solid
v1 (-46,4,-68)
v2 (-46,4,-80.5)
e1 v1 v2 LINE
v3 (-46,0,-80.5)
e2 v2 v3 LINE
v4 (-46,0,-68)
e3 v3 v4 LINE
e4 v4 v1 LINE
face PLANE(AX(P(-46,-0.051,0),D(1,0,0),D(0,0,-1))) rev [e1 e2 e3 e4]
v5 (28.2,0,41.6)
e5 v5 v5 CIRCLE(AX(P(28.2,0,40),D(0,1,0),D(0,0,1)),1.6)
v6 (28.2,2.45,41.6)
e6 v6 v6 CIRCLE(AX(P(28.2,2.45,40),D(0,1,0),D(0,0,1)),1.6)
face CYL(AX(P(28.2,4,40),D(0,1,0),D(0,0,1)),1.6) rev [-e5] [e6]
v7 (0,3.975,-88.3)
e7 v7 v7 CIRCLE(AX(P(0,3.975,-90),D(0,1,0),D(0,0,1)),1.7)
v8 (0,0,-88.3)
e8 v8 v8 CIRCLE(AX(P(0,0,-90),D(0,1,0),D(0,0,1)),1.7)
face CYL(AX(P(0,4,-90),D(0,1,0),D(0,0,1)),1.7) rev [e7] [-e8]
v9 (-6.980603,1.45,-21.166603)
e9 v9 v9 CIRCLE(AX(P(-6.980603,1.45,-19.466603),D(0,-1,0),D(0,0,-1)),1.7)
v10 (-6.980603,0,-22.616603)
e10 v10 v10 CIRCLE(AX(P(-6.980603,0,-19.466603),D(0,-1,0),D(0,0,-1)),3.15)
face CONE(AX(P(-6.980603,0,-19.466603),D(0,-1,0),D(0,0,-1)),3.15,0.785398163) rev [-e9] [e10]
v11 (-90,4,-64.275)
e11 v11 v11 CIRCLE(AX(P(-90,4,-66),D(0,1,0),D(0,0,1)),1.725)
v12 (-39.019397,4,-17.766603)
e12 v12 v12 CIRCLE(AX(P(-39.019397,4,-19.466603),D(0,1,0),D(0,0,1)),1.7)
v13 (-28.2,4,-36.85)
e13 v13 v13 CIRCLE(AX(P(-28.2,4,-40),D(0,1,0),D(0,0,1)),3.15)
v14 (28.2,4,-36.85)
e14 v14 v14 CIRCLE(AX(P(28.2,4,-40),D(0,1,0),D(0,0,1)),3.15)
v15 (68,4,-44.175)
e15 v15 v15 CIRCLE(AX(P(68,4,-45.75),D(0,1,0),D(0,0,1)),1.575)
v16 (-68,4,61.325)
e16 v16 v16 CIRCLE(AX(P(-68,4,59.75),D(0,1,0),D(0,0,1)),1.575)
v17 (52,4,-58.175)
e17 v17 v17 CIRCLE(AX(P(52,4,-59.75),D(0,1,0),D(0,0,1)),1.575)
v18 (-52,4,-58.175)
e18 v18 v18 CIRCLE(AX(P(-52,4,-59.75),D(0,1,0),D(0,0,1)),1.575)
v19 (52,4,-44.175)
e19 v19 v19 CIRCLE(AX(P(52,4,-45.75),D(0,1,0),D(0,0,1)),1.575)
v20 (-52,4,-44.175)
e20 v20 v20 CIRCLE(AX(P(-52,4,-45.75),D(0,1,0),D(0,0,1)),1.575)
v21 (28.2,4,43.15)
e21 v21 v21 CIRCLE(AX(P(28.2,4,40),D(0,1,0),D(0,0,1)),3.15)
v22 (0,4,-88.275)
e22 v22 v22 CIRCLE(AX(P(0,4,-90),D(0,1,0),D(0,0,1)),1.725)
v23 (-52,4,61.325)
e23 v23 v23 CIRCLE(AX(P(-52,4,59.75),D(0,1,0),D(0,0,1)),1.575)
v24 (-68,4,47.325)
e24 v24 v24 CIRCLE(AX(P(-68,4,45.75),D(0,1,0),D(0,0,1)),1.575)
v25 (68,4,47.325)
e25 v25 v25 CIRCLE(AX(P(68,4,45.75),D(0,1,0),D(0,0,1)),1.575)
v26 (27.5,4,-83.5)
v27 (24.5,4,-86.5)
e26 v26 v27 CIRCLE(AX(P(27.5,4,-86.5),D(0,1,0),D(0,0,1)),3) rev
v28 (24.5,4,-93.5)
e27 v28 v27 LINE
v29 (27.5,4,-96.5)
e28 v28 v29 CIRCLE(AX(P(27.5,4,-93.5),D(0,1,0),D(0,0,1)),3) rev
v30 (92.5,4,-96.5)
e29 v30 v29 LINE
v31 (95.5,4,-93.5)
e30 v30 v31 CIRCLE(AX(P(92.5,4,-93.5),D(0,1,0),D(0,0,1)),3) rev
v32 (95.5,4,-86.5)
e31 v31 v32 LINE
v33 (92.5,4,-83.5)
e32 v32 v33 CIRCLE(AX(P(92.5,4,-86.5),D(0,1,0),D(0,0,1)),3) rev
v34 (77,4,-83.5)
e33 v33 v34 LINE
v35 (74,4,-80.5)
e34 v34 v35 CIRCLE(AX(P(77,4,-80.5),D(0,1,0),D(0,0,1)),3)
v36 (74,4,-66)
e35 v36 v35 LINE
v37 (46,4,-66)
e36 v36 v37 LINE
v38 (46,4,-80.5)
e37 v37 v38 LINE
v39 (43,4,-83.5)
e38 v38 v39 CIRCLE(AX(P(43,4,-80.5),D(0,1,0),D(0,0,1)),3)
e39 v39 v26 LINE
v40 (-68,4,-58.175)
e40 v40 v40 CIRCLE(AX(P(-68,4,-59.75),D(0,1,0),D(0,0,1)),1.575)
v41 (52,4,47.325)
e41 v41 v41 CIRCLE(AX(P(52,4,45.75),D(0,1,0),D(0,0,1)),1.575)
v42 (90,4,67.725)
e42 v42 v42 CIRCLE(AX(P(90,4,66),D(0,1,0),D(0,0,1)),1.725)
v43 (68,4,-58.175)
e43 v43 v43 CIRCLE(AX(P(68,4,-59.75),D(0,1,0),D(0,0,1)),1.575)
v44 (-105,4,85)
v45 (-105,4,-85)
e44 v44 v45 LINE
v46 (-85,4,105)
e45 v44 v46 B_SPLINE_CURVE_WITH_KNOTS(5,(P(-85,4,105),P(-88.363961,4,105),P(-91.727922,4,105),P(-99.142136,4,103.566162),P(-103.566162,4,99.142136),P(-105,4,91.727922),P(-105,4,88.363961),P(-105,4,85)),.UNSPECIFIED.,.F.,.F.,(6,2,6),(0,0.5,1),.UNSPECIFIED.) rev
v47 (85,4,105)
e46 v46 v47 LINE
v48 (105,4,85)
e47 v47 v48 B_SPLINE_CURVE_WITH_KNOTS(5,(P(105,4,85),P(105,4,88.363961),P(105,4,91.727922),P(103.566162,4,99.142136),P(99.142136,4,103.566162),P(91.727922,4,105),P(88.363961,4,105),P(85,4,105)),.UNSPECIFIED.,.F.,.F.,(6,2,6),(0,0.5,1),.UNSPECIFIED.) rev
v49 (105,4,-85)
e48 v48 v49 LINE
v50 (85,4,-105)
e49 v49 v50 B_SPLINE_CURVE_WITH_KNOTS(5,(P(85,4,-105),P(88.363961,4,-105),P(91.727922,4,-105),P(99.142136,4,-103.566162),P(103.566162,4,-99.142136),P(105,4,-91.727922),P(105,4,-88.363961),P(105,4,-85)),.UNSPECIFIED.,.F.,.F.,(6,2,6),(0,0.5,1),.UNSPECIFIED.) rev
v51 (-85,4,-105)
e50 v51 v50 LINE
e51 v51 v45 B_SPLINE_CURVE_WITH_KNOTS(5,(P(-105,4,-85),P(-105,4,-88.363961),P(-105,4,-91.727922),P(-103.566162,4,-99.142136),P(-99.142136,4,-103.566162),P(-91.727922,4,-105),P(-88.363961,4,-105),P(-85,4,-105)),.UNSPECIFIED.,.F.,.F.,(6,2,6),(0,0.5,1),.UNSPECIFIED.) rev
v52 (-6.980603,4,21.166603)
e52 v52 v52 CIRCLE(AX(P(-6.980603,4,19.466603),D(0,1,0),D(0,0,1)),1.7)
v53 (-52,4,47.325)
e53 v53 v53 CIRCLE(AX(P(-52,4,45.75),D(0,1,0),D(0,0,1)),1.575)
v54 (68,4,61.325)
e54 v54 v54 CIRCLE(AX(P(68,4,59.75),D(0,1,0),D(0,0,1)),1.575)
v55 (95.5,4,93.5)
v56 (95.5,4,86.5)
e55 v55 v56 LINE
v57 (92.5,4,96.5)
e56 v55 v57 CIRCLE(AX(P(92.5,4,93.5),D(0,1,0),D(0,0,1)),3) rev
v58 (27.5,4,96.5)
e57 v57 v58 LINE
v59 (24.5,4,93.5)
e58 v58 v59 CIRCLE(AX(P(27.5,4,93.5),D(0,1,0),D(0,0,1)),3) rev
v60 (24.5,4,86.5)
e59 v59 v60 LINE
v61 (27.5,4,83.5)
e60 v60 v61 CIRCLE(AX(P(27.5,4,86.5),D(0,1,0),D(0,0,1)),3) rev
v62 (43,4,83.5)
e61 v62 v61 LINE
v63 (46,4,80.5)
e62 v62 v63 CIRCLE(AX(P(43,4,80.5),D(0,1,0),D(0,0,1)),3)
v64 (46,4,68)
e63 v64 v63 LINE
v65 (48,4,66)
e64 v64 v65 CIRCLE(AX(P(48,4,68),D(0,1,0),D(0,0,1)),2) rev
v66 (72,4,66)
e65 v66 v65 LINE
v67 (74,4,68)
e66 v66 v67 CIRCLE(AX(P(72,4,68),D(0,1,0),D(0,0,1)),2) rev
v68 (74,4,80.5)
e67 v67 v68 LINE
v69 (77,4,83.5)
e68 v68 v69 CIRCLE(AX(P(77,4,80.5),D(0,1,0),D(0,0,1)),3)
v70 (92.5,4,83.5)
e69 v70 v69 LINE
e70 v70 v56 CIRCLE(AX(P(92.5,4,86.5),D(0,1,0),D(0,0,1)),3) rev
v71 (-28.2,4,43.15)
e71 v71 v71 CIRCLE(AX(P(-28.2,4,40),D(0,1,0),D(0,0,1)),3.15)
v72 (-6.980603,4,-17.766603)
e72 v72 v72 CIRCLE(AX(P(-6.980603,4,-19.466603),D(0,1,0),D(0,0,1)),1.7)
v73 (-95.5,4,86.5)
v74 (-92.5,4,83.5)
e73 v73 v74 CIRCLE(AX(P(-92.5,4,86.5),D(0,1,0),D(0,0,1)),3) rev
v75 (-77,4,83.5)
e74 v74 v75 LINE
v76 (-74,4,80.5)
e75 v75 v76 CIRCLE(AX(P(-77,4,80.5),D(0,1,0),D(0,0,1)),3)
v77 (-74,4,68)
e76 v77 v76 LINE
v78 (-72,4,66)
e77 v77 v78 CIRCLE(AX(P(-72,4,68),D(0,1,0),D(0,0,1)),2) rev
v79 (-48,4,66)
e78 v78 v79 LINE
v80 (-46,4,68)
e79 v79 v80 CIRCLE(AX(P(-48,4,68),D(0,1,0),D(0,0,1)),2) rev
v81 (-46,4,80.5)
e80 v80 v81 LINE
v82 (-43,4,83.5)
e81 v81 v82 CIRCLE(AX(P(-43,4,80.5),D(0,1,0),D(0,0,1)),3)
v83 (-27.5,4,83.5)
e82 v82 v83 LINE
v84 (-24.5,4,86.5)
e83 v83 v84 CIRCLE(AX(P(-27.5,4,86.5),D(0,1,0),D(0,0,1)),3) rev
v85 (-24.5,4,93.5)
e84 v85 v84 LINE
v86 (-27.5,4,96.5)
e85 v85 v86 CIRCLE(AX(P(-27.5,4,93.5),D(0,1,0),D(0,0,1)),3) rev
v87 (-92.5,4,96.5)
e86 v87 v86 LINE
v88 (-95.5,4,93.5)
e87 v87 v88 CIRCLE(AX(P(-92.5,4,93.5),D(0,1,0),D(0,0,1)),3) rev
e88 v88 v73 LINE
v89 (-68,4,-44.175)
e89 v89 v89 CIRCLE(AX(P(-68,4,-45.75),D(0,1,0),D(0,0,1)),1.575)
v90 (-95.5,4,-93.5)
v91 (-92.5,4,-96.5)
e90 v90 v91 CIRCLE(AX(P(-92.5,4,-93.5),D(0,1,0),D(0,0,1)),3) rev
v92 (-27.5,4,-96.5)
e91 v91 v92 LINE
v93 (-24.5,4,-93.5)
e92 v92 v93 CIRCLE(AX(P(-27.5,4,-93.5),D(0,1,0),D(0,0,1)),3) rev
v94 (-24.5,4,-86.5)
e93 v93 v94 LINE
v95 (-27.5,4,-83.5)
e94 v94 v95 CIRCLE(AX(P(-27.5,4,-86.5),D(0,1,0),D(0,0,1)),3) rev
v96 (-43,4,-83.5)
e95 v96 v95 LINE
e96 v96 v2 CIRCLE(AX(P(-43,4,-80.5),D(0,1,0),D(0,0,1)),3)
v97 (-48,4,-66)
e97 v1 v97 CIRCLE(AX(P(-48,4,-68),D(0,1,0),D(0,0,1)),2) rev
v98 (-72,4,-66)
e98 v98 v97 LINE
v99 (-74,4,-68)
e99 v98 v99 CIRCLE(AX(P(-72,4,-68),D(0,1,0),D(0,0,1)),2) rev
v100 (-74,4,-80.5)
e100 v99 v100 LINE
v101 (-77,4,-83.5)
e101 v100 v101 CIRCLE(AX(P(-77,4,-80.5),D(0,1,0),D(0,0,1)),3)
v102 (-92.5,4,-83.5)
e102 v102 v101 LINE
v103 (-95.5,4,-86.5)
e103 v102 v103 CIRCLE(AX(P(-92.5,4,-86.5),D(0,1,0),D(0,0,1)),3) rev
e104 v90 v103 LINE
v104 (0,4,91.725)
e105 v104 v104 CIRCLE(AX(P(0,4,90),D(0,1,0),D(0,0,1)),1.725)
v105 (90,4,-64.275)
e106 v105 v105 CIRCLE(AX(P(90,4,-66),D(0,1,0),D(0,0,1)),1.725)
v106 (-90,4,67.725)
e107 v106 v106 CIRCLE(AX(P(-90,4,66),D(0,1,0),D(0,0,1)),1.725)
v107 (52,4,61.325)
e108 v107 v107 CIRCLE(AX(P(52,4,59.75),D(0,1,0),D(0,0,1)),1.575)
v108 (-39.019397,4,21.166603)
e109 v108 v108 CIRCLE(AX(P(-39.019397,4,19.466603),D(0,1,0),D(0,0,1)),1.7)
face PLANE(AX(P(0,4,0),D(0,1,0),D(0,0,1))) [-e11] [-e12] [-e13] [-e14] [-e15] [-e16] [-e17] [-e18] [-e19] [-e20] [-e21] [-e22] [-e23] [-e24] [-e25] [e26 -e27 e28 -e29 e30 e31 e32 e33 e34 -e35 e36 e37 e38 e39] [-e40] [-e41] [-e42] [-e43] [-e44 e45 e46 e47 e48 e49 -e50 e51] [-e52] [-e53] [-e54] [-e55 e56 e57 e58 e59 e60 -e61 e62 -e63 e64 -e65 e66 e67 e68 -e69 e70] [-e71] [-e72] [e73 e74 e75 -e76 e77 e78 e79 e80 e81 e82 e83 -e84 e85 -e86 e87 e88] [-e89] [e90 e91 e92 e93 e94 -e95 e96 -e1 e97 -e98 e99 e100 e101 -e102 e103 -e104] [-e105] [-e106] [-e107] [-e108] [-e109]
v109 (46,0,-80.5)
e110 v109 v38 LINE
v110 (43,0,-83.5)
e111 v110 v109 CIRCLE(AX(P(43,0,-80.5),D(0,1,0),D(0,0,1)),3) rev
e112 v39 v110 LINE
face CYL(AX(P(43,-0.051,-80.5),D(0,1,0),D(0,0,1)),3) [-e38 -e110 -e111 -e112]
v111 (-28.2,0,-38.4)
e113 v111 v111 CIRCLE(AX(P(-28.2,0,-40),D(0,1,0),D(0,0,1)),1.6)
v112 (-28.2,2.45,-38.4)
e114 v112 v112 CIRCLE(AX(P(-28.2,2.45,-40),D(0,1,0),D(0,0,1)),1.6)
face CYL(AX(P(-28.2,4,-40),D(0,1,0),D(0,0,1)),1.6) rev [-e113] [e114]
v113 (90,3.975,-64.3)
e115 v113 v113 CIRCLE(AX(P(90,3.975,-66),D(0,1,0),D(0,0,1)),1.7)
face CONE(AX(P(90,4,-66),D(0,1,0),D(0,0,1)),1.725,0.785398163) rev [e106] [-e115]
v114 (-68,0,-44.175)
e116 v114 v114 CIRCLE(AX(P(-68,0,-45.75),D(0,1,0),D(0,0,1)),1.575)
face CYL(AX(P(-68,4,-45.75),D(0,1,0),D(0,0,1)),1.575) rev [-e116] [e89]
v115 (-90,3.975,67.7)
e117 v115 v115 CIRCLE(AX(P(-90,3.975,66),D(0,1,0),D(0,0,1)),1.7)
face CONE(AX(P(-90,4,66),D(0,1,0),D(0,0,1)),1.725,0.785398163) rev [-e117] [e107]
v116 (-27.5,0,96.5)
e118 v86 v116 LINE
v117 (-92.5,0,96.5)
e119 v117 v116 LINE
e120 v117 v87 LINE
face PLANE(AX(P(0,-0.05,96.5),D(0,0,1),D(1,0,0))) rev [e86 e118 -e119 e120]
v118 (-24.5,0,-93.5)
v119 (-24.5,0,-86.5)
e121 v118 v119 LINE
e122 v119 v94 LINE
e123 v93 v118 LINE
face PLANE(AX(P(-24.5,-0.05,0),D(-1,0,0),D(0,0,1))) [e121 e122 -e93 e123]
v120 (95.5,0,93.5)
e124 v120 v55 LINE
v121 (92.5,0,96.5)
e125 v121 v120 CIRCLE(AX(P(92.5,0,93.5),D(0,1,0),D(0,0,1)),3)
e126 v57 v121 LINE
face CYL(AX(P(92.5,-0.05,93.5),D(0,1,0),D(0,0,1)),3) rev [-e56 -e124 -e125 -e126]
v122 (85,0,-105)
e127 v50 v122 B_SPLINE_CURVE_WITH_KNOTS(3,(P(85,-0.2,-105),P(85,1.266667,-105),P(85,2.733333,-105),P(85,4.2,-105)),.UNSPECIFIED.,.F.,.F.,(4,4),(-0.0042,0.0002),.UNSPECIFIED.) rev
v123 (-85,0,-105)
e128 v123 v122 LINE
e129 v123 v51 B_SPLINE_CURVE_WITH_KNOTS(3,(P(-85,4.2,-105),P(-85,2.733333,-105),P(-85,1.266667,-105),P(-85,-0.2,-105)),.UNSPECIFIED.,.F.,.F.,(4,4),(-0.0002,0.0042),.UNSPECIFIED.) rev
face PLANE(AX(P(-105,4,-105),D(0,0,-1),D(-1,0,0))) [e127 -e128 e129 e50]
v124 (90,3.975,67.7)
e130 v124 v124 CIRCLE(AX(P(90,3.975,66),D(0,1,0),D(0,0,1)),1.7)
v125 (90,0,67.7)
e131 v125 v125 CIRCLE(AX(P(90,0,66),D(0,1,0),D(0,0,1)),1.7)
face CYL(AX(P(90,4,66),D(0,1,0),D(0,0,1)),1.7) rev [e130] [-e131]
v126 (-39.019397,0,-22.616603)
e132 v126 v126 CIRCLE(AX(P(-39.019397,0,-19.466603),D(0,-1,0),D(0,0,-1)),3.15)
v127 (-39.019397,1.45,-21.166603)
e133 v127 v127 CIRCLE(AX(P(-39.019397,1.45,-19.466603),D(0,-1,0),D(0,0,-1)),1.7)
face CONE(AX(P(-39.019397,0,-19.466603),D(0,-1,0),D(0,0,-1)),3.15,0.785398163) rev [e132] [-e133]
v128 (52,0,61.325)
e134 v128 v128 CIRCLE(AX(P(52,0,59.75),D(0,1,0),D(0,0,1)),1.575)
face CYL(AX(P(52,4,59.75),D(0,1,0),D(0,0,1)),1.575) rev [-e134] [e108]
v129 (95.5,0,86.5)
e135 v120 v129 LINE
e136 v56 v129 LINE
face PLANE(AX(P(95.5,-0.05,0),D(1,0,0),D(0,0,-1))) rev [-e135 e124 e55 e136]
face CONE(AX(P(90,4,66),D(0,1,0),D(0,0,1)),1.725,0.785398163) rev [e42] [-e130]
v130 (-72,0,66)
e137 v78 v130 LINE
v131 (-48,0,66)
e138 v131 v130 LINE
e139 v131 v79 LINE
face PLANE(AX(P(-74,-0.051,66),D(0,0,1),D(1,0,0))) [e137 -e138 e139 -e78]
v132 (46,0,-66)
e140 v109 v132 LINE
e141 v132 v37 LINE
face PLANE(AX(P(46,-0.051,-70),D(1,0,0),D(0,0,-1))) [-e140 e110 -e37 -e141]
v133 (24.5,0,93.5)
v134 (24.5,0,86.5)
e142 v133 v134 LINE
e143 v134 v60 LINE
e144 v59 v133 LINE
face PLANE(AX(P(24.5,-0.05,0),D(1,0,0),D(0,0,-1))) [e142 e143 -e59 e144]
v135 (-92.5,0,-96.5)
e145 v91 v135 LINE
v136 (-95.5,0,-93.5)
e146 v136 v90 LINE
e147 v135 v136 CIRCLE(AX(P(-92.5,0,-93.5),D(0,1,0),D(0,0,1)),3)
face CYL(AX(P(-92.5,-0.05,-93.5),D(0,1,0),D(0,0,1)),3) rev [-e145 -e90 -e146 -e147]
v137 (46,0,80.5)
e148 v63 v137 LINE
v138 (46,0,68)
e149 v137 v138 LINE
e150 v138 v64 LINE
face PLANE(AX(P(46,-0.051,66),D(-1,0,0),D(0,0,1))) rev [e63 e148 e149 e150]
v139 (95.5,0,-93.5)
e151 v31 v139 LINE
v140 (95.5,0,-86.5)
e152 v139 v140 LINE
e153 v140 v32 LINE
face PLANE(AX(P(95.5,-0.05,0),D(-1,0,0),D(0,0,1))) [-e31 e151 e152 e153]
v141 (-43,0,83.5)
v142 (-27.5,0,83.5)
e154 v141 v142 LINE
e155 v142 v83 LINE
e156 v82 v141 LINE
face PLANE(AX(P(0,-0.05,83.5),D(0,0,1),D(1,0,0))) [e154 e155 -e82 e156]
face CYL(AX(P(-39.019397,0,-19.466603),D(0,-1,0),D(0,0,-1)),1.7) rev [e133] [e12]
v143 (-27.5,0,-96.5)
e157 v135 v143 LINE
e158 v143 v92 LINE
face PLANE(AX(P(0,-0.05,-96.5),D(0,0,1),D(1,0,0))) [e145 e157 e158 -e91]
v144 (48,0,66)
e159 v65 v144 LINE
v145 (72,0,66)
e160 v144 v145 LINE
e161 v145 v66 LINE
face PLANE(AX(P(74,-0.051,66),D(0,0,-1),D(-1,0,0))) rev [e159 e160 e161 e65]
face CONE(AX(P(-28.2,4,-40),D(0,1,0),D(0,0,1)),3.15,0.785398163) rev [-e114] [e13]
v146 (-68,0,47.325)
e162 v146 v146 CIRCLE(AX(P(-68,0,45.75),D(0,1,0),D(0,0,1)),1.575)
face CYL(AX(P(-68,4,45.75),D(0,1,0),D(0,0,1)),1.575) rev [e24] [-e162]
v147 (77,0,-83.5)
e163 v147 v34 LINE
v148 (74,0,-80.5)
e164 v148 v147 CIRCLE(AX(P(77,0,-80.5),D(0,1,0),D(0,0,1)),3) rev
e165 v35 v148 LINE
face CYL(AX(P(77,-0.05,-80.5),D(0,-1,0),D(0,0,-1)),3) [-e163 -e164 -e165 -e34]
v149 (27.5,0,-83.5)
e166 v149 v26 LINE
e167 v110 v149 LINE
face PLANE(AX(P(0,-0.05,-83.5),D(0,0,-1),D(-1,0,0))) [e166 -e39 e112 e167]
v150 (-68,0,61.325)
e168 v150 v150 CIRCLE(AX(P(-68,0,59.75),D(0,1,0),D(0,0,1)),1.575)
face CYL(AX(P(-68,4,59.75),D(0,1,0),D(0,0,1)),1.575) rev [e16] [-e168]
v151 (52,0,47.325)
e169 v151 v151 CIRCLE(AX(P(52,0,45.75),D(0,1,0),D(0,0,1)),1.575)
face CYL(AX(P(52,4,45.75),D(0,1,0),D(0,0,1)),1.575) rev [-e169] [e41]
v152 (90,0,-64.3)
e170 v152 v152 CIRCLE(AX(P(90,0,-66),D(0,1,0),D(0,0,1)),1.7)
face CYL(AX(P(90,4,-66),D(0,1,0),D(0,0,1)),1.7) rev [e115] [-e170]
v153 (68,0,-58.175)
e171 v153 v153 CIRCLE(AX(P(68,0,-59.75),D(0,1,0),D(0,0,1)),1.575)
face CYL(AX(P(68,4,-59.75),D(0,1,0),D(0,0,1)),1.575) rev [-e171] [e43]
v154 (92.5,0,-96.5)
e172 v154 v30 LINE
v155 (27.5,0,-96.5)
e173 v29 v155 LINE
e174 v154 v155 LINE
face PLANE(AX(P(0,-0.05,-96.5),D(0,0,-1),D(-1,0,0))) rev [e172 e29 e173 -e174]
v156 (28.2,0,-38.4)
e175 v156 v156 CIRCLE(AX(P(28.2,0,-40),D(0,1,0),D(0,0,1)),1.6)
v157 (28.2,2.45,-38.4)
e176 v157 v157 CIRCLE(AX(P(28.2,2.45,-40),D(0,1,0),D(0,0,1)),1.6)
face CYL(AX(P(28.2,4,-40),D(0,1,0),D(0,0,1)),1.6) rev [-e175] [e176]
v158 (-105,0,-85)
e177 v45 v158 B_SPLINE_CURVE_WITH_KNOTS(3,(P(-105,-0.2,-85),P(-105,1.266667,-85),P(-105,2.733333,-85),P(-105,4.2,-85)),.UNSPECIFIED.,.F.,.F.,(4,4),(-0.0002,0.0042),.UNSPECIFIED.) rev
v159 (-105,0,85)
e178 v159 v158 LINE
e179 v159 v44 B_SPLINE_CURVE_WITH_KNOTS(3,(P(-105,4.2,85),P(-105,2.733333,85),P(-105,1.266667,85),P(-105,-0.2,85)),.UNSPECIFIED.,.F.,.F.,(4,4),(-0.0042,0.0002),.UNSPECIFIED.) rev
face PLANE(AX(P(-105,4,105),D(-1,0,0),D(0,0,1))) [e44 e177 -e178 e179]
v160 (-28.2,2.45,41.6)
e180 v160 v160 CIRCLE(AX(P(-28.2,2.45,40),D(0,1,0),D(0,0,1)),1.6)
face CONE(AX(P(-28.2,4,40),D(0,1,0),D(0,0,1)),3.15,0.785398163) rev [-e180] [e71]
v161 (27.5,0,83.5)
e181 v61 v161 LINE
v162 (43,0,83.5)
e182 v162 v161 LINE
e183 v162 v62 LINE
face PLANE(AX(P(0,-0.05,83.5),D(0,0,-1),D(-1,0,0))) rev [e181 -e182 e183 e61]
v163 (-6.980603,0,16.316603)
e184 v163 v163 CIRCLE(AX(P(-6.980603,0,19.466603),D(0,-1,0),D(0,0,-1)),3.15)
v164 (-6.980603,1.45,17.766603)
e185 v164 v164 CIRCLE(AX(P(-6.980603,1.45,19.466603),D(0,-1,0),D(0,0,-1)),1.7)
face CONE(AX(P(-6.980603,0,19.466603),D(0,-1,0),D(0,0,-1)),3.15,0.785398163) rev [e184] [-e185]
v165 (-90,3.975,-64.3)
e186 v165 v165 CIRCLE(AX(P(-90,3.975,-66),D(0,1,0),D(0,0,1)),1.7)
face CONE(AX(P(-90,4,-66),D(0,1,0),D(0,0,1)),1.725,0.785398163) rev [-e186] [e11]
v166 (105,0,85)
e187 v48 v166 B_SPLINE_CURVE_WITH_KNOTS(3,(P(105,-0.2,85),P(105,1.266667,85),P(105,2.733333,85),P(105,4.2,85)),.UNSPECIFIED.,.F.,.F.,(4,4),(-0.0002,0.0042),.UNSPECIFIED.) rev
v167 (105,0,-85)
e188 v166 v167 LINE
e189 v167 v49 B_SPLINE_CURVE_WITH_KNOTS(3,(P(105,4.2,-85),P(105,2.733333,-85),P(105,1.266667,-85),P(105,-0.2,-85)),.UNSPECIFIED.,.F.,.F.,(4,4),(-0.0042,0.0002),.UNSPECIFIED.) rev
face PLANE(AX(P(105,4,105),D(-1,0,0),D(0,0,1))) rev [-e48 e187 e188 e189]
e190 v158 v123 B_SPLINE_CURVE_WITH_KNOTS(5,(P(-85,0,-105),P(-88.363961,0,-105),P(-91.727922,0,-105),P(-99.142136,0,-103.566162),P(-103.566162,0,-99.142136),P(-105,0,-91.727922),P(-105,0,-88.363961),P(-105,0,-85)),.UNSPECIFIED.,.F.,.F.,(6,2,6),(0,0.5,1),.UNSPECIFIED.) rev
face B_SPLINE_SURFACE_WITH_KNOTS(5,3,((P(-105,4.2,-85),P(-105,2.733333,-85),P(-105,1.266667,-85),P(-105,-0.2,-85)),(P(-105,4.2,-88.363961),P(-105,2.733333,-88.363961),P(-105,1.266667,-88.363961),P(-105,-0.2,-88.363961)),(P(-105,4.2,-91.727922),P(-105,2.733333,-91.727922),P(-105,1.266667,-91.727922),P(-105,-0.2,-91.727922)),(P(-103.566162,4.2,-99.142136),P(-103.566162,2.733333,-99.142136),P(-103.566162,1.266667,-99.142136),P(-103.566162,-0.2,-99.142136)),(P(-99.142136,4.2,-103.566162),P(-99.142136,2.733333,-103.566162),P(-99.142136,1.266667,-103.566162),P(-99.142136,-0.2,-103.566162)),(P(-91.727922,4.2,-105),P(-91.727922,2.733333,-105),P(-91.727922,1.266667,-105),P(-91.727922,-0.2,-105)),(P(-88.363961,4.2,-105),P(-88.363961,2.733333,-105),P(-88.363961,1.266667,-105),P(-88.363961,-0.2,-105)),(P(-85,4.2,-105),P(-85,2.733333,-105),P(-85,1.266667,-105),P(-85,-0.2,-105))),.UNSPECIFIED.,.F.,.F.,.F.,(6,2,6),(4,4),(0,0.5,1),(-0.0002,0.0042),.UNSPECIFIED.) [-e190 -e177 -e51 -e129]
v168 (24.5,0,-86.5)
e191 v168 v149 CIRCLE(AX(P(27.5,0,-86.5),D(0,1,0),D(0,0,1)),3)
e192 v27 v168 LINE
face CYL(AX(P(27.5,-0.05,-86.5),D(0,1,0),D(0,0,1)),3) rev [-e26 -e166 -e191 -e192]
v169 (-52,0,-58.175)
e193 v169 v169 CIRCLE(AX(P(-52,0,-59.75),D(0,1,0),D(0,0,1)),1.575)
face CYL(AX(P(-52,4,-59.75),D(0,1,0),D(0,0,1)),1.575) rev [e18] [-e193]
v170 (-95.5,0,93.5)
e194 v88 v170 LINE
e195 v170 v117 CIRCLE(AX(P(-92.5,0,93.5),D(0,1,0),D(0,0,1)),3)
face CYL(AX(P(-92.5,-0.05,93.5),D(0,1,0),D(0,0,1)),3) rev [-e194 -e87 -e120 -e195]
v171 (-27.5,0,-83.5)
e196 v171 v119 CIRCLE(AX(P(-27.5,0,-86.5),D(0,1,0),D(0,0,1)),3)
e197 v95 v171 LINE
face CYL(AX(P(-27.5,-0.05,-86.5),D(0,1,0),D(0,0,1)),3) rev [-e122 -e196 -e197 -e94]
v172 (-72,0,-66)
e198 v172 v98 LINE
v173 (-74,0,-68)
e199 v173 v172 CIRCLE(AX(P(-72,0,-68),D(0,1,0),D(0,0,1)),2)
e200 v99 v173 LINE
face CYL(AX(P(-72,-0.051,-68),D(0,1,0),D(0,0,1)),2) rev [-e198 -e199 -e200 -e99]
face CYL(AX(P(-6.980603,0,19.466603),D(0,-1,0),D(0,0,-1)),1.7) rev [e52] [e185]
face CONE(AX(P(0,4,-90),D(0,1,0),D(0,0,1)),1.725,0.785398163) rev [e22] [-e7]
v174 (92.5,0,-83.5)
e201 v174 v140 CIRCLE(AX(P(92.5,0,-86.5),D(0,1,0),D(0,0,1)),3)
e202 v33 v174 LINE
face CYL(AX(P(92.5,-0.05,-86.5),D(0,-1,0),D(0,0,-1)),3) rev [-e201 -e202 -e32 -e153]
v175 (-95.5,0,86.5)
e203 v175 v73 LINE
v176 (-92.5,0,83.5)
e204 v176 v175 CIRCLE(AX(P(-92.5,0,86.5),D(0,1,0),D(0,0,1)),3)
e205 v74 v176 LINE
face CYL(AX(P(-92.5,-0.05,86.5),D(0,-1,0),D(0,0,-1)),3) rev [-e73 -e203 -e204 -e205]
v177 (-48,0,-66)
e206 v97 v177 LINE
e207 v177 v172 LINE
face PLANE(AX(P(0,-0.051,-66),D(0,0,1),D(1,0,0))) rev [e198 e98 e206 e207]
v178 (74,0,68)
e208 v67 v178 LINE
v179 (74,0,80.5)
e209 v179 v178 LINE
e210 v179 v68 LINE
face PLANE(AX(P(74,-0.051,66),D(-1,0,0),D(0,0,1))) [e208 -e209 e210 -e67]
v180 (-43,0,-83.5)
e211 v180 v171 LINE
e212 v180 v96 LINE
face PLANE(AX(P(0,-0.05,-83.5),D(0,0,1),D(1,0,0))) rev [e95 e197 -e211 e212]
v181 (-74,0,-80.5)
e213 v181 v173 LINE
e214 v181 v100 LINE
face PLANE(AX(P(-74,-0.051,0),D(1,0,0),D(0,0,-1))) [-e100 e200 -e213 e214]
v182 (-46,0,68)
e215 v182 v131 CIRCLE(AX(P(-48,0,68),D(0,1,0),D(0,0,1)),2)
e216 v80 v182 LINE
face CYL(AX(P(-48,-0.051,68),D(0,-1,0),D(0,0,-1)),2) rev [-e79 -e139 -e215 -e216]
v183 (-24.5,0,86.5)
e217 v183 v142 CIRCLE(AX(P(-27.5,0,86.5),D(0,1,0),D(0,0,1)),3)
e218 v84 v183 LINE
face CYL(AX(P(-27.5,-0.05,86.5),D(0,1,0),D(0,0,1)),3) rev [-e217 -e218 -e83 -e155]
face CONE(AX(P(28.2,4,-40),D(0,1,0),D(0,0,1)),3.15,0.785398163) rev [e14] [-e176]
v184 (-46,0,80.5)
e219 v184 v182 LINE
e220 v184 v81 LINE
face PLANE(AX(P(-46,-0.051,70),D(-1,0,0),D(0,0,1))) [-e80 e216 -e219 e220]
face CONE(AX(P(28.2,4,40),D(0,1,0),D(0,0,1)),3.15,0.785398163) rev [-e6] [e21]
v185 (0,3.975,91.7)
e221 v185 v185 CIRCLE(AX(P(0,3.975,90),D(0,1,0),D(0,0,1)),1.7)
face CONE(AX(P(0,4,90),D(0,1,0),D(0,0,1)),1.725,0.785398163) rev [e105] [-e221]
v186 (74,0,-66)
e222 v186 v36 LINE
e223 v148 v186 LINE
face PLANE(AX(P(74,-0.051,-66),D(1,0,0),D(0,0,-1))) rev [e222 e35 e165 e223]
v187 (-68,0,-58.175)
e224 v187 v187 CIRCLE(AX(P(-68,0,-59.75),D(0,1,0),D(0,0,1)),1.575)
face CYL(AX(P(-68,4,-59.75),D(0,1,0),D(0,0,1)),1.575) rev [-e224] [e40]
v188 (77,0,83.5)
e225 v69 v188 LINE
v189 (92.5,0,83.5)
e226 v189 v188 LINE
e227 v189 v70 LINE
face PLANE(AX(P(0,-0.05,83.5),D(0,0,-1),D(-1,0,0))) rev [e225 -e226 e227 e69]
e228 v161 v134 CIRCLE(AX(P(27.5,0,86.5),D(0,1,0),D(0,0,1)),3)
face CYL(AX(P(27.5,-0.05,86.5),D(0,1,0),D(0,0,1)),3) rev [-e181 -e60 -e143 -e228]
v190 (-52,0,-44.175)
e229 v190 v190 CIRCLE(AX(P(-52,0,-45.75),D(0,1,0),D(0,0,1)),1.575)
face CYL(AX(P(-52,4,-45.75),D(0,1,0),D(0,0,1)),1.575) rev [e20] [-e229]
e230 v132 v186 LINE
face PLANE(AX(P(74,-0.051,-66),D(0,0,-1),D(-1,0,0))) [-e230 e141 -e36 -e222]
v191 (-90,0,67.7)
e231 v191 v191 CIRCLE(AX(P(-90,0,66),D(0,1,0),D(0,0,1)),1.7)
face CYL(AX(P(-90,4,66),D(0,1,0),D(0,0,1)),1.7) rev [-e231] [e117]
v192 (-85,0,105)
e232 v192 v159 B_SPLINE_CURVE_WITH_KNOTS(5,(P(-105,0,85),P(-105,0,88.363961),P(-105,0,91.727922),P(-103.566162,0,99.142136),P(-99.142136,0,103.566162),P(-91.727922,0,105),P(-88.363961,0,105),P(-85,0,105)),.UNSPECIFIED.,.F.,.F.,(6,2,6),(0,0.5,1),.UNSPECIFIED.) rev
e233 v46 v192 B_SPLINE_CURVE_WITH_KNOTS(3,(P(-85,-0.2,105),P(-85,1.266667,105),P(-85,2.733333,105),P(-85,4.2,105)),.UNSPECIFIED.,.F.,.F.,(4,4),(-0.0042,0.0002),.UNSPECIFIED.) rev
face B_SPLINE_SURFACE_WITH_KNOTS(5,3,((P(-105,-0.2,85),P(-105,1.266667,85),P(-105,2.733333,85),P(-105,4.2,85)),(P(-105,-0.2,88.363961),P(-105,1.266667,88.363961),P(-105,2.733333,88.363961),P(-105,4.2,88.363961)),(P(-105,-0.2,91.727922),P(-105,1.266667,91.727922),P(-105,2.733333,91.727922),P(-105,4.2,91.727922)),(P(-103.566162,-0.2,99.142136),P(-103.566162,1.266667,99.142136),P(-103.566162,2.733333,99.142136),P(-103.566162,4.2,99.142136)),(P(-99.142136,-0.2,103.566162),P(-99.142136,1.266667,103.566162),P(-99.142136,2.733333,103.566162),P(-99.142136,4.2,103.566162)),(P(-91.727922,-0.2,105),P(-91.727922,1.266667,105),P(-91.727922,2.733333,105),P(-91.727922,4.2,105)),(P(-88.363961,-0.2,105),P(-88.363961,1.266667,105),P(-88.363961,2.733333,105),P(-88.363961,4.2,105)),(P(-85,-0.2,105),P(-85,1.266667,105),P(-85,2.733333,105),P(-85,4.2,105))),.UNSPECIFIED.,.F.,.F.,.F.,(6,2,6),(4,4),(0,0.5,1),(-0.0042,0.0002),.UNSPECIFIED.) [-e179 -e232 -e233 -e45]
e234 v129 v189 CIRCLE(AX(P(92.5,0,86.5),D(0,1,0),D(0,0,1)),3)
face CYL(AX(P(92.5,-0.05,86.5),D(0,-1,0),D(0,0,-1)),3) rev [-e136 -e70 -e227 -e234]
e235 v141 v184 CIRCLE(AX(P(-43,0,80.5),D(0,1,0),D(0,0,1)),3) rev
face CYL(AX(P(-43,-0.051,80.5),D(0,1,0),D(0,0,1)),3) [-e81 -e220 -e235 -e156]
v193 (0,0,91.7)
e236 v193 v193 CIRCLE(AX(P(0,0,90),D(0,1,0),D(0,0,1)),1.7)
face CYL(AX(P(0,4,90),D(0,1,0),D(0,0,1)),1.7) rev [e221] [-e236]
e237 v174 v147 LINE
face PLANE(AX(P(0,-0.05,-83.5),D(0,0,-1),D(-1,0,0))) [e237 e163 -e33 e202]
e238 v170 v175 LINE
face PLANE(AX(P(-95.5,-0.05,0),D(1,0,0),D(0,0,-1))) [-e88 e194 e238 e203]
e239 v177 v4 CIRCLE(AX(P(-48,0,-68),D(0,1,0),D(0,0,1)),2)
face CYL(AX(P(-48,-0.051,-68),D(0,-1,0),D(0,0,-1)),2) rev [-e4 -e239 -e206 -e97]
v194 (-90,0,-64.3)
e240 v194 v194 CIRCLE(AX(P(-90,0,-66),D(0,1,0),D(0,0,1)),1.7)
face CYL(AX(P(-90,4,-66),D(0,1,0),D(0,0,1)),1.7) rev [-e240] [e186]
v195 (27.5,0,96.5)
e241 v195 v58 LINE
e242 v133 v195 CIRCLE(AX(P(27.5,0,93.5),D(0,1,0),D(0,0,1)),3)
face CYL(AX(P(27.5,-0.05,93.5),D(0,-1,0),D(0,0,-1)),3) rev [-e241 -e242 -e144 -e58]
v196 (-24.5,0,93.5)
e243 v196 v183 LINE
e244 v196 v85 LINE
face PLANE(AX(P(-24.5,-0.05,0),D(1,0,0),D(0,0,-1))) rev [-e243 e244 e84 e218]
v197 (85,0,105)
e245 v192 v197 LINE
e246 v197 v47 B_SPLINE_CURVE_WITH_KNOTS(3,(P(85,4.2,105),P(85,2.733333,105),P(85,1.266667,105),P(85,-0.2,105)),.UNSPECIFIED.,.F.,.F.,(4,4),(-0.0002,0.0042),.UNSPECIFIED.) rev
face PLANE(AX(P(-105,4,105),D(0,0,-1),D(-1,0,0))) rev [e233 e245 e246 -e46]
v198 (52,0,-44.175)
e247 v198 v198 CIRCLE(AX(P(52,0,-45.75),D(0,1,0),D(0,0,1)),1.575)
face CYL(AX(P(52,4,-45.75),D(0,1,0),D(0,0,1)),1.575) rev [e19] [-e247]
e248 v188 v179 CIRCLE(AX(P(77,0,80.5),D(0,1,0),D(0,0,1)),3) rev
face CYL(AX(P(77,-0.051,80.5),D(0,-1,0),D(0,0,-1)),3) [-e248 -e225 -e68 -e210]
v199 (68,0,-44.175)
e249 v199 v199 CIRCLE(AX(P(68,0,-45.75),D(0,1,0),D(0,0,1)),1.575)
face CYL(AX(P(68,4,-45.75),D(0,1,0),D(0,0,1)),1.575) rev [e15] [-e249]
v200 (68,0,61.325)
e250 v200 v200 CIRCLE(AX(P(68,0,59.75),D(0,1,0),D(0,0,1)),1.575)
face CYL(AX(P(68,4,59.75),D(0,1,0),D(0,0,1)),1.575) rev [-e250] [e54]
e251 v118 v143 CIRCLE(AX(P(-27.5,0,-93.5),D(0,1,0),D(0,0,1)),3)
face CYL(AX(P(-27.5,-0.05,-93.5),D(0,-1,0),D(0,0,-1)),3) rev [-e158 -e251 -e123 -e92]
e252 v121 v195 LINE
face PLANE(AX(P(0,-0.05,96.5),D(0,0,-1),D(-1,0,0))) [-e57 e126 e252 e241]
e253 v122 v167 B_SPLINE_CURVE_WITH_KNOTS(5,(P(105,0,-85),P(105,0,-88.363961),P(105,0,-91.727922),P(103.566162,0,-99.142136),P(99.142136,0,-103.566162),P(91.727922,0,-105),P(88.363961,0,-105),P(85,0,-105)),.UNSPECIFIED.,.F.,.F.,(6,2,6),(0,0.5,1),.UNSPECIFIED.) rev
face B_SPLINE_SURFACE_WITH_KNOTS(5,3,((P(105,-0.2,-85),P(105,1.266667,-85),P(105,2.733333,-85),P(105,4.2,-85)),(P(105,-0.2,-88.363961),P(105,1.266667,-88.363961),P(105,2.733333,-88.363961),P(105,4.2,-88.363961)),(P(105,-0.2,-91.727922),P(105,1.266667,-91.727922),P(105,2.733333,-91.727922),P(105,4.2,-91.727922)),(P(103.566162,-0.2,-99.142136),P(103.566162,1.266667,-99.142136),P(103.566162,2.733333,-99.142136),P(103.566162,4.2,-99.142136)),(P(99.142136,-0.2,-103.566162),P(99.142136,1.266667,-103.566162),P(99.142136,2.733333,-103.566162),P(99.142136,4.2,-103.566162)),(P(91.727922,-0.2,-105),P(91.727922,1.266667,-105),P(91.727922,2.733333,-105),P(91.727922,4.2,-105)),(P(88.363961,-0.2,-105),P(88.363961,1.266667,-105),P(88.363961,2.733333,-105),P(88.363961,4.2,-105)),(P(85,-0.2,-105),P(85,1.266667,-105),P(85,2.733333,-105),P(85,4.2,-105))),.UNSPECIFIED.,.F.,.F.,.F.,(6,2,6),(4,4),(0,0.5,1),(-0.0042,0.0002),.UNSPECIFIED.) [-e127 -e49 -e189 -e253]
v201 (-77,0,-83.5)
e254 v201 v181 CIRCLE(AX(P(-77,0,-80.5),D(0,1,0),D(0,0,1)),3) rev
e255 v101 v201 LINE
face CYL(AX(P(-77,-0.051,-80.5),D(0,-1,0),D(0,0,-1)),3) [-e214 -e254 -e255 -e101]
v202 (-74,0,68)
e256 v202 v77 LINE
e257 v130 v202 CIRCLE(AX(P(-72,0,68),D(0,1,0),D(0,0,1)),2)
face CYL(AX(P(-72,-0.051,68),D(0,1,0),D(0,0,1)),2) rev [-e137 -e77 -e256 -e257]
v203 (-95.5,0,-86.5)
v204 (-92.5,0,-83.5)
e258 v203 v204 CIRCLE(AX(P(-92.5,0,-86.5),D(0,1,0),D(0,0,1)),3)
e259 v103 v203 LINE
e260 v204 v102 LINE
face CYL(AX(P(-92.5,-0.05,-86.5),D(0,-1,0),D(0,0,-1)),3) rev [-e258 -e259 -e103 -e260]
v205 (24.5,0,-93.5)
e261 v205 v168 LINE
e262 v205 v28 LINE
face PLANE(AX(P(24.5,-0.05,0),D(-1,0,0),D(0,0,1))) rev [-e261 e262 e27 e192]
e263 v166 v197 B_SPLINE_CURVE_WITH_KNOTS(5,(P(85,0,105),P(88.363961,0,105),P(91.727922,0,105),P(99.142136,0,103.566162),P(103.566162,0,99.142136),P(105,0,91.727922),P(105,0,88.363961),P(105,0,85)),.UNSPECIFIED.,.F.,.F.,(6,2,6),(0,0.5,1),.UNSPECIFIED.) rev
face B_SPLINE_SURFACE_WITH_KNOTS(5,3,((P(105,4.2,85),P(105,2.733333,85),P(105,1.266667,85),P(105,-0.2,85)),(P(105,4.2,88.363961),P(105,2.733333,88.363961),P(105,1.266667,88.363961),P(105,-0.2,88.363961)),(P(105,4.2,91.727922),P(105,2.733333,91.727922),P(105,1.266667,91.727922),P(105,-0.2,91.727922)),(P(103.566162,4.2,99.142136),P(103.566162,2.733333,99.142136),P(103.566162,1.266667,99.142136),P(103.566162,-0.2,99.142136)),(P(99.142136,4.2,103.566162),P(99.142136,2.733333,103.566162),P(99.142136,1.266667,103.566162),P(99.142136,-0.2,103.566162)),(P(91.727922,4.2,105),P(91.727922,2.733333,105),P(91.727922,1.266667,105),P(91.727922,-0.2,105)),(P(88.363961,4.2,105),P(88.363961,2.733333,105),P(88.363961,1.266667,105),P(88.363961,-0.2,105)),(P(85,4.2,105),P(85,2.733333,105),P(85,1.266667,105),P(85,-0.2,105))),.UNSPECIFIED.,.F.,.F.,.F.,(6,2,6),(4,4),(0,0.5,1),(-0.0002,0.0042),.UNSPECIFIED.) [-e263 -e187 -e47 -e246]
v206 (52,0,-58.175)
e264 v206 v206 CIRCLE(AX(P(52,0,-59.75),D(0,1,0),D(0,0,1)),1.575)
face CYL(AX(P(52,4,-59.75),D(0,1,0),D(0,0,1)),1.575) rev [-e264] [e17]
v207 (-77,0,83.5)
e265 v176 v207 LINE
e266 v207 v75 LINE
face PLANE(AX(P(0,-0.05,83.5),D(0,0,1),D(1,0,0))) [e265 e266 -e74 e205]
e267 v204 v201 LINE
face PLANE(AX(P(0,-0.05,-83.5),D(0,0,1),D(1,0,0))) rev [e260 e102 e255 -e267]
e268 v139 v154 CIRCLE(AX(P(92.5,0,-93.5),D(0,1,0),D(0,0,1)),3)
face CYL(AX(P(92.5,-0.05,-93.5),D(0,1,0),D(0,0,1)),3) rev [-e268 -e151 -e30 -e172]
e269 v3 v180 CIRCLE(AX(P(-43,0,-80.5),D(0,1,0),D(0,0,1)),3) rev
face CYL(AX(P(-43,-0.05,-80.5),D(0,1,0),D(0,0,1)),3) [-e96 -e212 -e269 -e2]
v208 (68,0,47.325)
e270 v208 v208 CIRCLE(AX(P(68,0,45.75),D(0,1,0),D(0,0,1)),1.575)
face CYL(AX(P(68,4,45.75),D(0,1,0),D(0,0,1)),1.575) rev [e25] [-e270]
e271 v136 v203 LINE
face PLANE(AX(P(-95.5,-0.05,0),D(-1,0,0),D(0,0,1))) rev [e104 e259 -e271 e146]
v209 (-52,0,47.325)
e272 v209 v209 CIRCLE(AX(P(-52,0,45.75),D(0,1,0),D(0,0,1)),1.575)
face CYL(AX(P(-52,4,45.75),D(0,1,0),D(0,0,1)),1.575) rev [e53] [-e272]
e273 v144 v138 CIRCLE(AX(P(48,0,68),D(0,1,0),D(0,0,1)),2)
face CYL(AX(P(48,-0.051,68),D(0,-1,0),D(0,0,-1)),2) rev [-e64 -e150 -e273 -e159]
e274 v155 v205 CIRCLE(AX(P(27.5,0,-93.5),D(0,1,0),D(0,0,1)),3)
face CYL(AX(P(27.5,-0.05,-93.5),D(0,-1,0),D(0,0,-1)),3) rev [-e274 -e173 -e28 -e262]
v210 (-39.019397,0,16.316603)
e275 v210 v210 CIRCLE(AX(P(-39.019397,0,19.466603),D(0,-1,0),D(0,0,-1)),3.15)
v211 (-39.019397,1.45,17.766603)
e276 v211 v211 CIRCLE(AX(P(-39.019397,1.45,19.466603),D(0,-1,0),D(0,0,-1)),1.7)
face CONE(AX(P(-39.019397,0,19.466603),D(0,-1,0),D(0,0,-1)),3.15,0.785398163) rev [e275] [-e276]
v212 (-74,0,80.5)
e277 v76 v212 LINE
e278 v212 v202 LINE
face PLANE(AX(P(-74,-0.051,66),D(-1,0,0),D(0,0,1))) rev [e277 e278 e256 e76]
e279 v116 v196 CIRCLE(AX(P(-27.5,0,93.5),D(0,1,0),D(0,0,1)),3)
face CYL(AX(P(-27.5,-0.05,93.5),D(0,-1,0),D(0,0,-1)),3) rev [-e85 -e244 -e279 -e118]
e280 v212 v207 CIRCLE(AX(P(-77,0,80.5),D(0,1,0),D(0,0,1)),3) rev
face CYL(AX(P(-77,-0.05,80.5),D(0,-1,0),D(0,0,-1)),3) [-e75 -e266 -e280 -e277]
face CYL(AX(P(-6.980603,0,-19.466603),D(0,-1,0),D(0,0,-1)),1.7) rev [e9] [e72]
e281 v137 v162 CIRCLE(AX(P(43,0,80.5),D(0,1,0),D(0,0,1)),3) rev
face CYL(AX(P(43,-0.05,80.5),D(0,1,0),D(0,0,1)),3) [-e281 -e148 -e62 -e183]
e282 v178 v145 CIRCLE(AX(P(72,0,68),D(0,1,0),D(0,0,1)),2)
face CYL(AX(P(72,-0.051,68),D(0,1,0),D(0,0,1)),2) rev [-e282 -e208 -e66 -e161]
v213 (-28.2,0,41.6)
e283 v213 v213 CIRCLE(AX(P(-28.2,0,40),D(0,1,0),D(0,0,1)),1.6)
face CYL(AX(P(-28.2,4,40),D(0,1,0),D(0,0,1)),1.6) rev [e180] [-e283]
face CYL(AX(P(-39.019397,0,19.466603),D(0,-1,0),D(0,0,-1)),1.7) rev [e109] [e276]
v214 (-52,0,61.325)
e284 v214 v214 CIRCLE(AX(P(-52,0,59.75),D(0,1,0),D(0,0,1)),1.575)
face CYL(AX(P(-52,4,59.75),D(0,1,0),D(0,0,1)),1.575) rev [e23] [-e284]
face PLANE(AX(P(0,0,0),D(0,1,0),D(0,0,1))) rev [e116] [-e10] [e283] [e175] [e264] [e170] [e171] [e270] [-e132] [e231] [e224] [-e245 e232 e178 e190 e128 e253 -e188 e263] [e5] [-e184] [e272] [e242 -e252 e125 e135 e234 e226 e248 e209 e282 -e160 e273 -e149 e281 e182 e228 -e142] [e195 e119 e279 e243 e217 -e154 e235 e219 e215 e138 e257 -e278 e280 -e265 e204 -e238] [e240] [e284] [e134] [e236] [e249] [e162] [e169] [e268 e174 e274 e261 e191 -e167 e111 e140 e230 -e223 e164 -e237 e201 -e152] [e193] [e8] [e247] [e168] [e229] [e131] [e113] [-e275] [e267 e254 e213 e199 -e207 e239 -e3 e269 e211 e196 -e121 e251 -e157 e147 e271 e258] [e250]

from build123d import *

# Parameters (mm, degrees)
SKETCH_1_W                    = 210
SKETCH_1_H                    = 210
EXTRUDE_1_DEPTH               = 4
FILLET_1_SIZE                 = 20
HOLE_WIZARD_M31_D             = 3.15
HOLE_WIZARD_M31_DEPTH         = 8
HOLE_WIZARD_M31_TIP           = 0.946355475
HOLE_WIZARD_M35_D             = 3.4
HOLE_WIZARD_M35_CSINK_D       = 3.45
HOLE_WIZARD_M35_CSINK_ANGLE   = 90
HOLE_WIZARD_M31_2_D           = 3.2
HOLE_WIZARD_M31_2_DEPTH       = 4
HOLE_WIZARD_M31_2_CSINK_D     = 6.3
HOLE_WIZARD_M31_2_CSINK_ANGLE = 90
HOLE_WIZARD_M31_2_TIP         = 0.96137699
SKETCH_45_W                   = 71
SKETCH_45_H                   = 13
CUT_EXTRUDE_3_DEPTH           = 149.546289226
CUT_EXTRUDE_2_REACH           = 150.546
SKETCH_17_W                   = 28
SKETCH_17_H                   = 13.5
SKETCH_17_H_2                 = 4
FILLET_2_R                    = 2
FILLET_3_R                    = 3
FILLET_5_R                    = 3
HOLE_WIZARD_M32_D             = 3.4
HOLE_WIZARD_M32_CSINK_D       = 6.3
HOLE_WIZARD_M32_CSINK_ANGLE   = 90


with BuildPart() as part:
    # Эскиз1 → Бобышка-Вытянуть1 (new body)
    with BuildSketch(Plane(origin=(0, 0, 0), x_dir=(1, 0, 0), z_dir=(0, 1, 0))):
        Rectangle(SKETCH_1_W, SKETCH_1_H)
    extrude(amount=EXTRUDE_1_DEPTH)

    # Скругление1
    # a fillet whose section is not a circle: 20 mm, written as the material it takes off along each edge
    with BuildSketch(Plane(origin=(-105, -50, -105), x_dir=(1, 0, 0), z_dir=(0, 1, 0)), Plane(origin=(105, -50, -105), x_dir=(0, 0, 1), z_dir=(0, 1, 0)), Plane(origin=(105, -50, 105), x_dir=(-1, 0, 0), z_dir=(0, 1, 0))) as fillet_1_piece_1:
        with BuildLine():
            add(Edge.make_bspline([(FILLET_1_SIZE, 0), (FILLET_1_SIZE * 0.831801948466, 0), (FILLET_1_SIZE * 0.663603896932, 0), (FILLET_1_SIZE * 0.292893218813, -FILLET_1_SIZE * 0.0716919198361), (FILLET_1_SIZE * 0.0716919198361, -FILLET_1_SIZE * 0.292893218813), (0, -FILLET_1_SIZE * 0.663603896932), (0, -FILLET_1_SIZE * 0.831801948466), (0, -FILLET_1_SIZE)], knots=[0, 0, 0, 0, 0, 0, 0.5, 0.5, 1, 1, 1, 1, 1, 1], degree=5))
            Line((0, -FILLET_1_SIZE), (0, 0))
            Line((0, 0), (FILLET_1_SIZE, 0))
        make_face()
    extrude(amount=104, mode=Mode.SUBTRACT)
    with BuildSketch(Plane(origin=(-105, -50, 105), x_dir=(1, 0, 0), z_dir=(0, 1, 0))) as fillet_1_piece_2:
        with BuildLine():
            add(Edge.make_bspline([(FILLET_1_SIZE, 0), (FILLET_1_SIZE * 0.831801948466, 0), (FILLET_1_SIZE * 0.663603896932, 0), (FILLET_1_SIZE * 0.292893218813, FILLET_1_SIZE * 0.0716919198361), (FILLET_1_SIZE * 0.0716919198361, FILLET_1_SIZE * 0.292893218813), (0, FILLET_1_SIZE * 0.663603896932), (0, FILLET_1_SIZE * 0.831801948466), (0, FILLET_1_SIZE)], knots=[0, 0, 0, 0, 0, 0, 0.5, 0.5, 1, 1, 1, 1, 1, 1], degree=5))
            Line((0, FILLET_1_SIZE), (0, 0))
            Line((0, 0), (FILLET_1_SIZE, 0))
        make_face()
    extrude(amount=104, mode=Mode.SUBTRACT)

    # Hole Wizard M31
    with Locations(Plane(origin=(0, 4, 0), x_dir=(1, 0, 0), z_dir=(0, 1, 0))):
        with Locations((-68, 59.75), (-52, 59.75), (-68, 45.75), (-52, 45.75), (-52, -59.75), (-52, -45.75), (-68, -59.75), (52, -59.75), (52, -45.75), (68, -59.75), (68, -45.75), (52, 59.75), (52, 45.75), (-68, -45.75), (68, 45.75), (68, 59.75)):
            Hole(HOLE_WIZARD_M31_D / 2, depth=HOLE_WIZARD_M31_DEPTH)
            with Locations((0, 0, -(HOLE_WIZARD_M31_DEPTH + HOLE_WIZARD_M31_TIP / 2))):  # 118° drill point
                Cone(0, HOLE_WIZARD_M31_D / 2, HOLE_WIZARD_M31_TIP, mode=Mode.SUBTRACT)

    # Отверстие с зазором M35 (through all)
    with Locations(Plane(origin=(0, 4, 0), x_dir=(1, 0, 0), z_dir=(0, 1, 0))):
        with Locations((90, 66), (-90, 66), (-90, -66), (90, -66), (0, -90), (0, 90)):
            CounterSinkHole(HOLE_WIZARD_M35_D / 2, HOLE_WIZARD_M35_CSINK_D / 2, counter_sink_angle=HOLE_WIZARD_M35_CSINK_ANGLE)

    # Hole Wizard M31 2
    with Locations(Plane(origin=(0, 4, 0), x_dir=(1, 0, 0), z_dir=(0, 1, 0))):
        with Locations((28.2, 40), (-28.2, 40), (-28.2, -40), (28.2, -40)):
            CounterSinkHole(HOLE_WIZARD_M31_2_D / 2, HOLE_WIZARD_M31_2_CSINK_D / 2, depth=HOLE_WIZARD_M31_2_DEPTH, counter_sink_angle=HOLE_WIZARD_M31_2_CSINK_ANGLE)
            with Locations((0, 0, -(HOLE_WIZARD_M31_2_DEPTH + HOLE_WIZARD_M31_2_TIP / 2))):  # 118° drill point
                Cone(0, HOLE_WIZARD_M31_2_D / 2, HOLE_WIZARD_M31_2_TIP, mode=Mode.SUBTRACT)

    # Эскиз45 → Вырез-Вытянуть3 (cut, through all)
    with BuildSketch(Plane(origin=(0, 4, 0), x_dir=(1, 0, 0), z_dir=(0, 1, 0))):
        with Locations((-60, 90)):
            Rectangle(SKETCH_45_W, SKETCH_45_H)
        with Locations((-60, -90)):
            Rectangle(SKETCH_45_W, SKETCH_45_H)
        with Locations((60, -90)):
            Rectangle(SKETCH_45_W, SKETCH_45_H)
        with Locations((60, 90)):
            Rectangle(SKETCH_45_W, SKETCH_45_H)
    extrude(amount=-CUT_EXTRUDE_3_DEPTH, mode=Mode.SUBTRACT)

    # Эскиз17 → Вырез-Вытянуть2 (cut, up to next)
    with BuildSketch(Plane(origin=(0, 4, 0), x_dir=(1, 0, 0), z_dir=(0, 1, 0)), mode=Mode.PRIVATE) as cut_extrude_2_sk1:
        with Locations((-60, 76.75)):
            Rectangle(SKETCH_17_W, SKETCH_17_H)
    cut_extrude_2_tool1 = extrude(cut_extrude_2_sk1.sketch, amount=-CUT_EXTRUDE_2_REACH, mode=Mode.PRIVATE) & part.part
    # Эскиз17 → Вырез-Вытянуть2 (cut, up to next)
    with BuildSketch(Plane(origin=(0, 4, 0), x_dir=(1, 0, 0), z_dir=(0, 1, 0)), mode=Mode.PRIVATE) as cut_extrude_2_sk2:
        with Locations((-60, 68)):
            Rectangle(SKETCH_17_W, SKETCH_17_H_2)
    cut_extrude_2_tool2 = extrude(cut_extrude_2_sk2.sketch, amount=-CUT_EXTRUDE_2_REACH, mode=Mode.PRIVATE) & part.part
    # Эскиз17 → Вырез-Вытянуть2 (cut, up to next)
    with BuildSketch(Plane(origin=(0, 4, 0), x_dir=(1, 0, 0), z_dir=(0, 1, 0)), mode=Mode.PRIVATE) as cut_extrude_2_sk3:
        Polygon((-46, -70), (-46, -83.5), (-74, -83.5), (-74, -70), (-74, -66), (-46, -66), align=None)
    cut_extrude_2_tool3 = extrude(cut_extrude_2_sk3.sketch, amount=-CUT_EXTRUDE_2_REACH, mode=Mode.PRIVATE) & part.part
    # Эскиз17 → Вырез-Вытянуть2 (cut, up to next)
    with BuildSketch(Plane(origin=(0, 4, 0), x_dir=(1, 0, 0), z_dir=(0, 1, 0)), mode=Mode.PRIVATE) as cut_extrude_2_sk4:
        Polygon((74, -83.5), (46, -83.5), (46, -70), (46, -66), (74, -66), (74, -70), align=None)
    cut_extrude_2_tool4 = extrude(cut_extrude_2_sk4.sketch, amount=-CUT_EXTRUDE_2_REACH, mode=Mode.PRIVATE) & part.part
    # Эскиз17 → Вырез-Вытянуть2 (cut, up to next)
    with BuildSketch(Plane(origin=(0, 4, 0), x_dir=(1, 0, 0), z_dir=(0, 1, 0)), mode=Mode.PRIVATE) as cut_extrude_2_sk5:
        Polygon((46, 70), (46, 83.5), (74, 83.5), (74, 70), (74, 66), (46, 66), align=None)
    cut_extrude_2_tool5 = extrude(cut_extrude_2_sk5.sketch, amount=-CUT_EXTRUDE_2_REACH, mode=Mode.PRIVATE) & part.part
    add(cut_extrude_2_tool1.solids().sort_by_distance((-60, 4, -76.75))[0], mode=Mode.SUBTRACT)
    add(cut_extrude_2_tool2.solids().sort_by_distance((-60, 4, -68))[0], mode=Mode.SUBTRACT)
    add(cut_extrude_2_tool3.solids().sort_by_distance((-60, 4, 74.75))[0], mode=Mode.SUBTRACT)
    add(cut_extrude_2_tool4.solids().sort_by_distance((60, 4, 74.75))[0], mode=Mode.SUBTRACT)
    add(cut_extrude_2_tool5.solids().sort_by_distance((60, 4, -74.75))[0], mode=Mode.SUBTRACT)

    # Скругление2
    fillet_2_edges = [part.edges().sort_by_distance(p)[0] for p in [
        (46, 2, 66),
        (74, 2, 66),
        (-46, 2, 66),
        (-74, 2, 66),
        (-74, 2, -66),
        (-46, 2, -66),
    ]]
    fillet(fillet_2_edges, radius=FILLET_2_R)

    # Скругление3
    fillet_3_edges = [part.edges().sort_by_distance(p)[0] for p in [
        (46, 2, -83.5),
        (74, 2, -83.5),
        (74, 2, 83.5),
        (46, 2, 83.5),
        (-46, 2, 83.5),
        (-74, 2, 83.5),
        (-74, 2, -83.5),
        (-46, 2, -83.5),
    ]]
    fillet(fillet_3_edges, radius=FILLET_3_R)

    # Скругление5
    fillet_5_edges = [part.edges().sort_by_distance(p)[0] for p in [
        (-95.5, 2, 83.5),
        (-24.5, 2, 83.5),
        (-24.5, 2, 96.5),
        (-95.5, 2, 96.5),
        (95.5, 2, 96.5),
        (24.5, 2, 96.5),
        (24.5, 2, 83.5),
        (95.5, 2, 83.5),
        (95.5, 2, -83.5),
        (24.5, 2, -83.5),
        (24.5, 2, -96.5),
        (95.5, 2, -96.5),
        (-24.5, 2, -96.5),
        (-24.5, 2, -83.5),
        (-95.5, 2, -83.5),
        (-95.5, 2, -96.5),
    ]]
    fillet(fillet_5_edges, radius=FILLET_5_R)

    # Зенковка для винта с полупотайной головкой M32 (through all)
    with Locations(Plane(origin=(0, 0, 0), x_dir=(-1, 0, 0), z_dir=(0, -1, 0))):
        with Locations((39.01939717, 19.466602706), (6.98060283, 19.466602706), (6.98060283, -19.466602706), (39.01939717, -19.466602706)):
            CounterSinkHole(HOLE_WIZARD_M32_D / 2, HOLE_WIZARD_M32_CSINK_D / 2, counter_sink_angle=HOLE_WIZARD_M32_CSINK_ANGLE)


solid = part.part
